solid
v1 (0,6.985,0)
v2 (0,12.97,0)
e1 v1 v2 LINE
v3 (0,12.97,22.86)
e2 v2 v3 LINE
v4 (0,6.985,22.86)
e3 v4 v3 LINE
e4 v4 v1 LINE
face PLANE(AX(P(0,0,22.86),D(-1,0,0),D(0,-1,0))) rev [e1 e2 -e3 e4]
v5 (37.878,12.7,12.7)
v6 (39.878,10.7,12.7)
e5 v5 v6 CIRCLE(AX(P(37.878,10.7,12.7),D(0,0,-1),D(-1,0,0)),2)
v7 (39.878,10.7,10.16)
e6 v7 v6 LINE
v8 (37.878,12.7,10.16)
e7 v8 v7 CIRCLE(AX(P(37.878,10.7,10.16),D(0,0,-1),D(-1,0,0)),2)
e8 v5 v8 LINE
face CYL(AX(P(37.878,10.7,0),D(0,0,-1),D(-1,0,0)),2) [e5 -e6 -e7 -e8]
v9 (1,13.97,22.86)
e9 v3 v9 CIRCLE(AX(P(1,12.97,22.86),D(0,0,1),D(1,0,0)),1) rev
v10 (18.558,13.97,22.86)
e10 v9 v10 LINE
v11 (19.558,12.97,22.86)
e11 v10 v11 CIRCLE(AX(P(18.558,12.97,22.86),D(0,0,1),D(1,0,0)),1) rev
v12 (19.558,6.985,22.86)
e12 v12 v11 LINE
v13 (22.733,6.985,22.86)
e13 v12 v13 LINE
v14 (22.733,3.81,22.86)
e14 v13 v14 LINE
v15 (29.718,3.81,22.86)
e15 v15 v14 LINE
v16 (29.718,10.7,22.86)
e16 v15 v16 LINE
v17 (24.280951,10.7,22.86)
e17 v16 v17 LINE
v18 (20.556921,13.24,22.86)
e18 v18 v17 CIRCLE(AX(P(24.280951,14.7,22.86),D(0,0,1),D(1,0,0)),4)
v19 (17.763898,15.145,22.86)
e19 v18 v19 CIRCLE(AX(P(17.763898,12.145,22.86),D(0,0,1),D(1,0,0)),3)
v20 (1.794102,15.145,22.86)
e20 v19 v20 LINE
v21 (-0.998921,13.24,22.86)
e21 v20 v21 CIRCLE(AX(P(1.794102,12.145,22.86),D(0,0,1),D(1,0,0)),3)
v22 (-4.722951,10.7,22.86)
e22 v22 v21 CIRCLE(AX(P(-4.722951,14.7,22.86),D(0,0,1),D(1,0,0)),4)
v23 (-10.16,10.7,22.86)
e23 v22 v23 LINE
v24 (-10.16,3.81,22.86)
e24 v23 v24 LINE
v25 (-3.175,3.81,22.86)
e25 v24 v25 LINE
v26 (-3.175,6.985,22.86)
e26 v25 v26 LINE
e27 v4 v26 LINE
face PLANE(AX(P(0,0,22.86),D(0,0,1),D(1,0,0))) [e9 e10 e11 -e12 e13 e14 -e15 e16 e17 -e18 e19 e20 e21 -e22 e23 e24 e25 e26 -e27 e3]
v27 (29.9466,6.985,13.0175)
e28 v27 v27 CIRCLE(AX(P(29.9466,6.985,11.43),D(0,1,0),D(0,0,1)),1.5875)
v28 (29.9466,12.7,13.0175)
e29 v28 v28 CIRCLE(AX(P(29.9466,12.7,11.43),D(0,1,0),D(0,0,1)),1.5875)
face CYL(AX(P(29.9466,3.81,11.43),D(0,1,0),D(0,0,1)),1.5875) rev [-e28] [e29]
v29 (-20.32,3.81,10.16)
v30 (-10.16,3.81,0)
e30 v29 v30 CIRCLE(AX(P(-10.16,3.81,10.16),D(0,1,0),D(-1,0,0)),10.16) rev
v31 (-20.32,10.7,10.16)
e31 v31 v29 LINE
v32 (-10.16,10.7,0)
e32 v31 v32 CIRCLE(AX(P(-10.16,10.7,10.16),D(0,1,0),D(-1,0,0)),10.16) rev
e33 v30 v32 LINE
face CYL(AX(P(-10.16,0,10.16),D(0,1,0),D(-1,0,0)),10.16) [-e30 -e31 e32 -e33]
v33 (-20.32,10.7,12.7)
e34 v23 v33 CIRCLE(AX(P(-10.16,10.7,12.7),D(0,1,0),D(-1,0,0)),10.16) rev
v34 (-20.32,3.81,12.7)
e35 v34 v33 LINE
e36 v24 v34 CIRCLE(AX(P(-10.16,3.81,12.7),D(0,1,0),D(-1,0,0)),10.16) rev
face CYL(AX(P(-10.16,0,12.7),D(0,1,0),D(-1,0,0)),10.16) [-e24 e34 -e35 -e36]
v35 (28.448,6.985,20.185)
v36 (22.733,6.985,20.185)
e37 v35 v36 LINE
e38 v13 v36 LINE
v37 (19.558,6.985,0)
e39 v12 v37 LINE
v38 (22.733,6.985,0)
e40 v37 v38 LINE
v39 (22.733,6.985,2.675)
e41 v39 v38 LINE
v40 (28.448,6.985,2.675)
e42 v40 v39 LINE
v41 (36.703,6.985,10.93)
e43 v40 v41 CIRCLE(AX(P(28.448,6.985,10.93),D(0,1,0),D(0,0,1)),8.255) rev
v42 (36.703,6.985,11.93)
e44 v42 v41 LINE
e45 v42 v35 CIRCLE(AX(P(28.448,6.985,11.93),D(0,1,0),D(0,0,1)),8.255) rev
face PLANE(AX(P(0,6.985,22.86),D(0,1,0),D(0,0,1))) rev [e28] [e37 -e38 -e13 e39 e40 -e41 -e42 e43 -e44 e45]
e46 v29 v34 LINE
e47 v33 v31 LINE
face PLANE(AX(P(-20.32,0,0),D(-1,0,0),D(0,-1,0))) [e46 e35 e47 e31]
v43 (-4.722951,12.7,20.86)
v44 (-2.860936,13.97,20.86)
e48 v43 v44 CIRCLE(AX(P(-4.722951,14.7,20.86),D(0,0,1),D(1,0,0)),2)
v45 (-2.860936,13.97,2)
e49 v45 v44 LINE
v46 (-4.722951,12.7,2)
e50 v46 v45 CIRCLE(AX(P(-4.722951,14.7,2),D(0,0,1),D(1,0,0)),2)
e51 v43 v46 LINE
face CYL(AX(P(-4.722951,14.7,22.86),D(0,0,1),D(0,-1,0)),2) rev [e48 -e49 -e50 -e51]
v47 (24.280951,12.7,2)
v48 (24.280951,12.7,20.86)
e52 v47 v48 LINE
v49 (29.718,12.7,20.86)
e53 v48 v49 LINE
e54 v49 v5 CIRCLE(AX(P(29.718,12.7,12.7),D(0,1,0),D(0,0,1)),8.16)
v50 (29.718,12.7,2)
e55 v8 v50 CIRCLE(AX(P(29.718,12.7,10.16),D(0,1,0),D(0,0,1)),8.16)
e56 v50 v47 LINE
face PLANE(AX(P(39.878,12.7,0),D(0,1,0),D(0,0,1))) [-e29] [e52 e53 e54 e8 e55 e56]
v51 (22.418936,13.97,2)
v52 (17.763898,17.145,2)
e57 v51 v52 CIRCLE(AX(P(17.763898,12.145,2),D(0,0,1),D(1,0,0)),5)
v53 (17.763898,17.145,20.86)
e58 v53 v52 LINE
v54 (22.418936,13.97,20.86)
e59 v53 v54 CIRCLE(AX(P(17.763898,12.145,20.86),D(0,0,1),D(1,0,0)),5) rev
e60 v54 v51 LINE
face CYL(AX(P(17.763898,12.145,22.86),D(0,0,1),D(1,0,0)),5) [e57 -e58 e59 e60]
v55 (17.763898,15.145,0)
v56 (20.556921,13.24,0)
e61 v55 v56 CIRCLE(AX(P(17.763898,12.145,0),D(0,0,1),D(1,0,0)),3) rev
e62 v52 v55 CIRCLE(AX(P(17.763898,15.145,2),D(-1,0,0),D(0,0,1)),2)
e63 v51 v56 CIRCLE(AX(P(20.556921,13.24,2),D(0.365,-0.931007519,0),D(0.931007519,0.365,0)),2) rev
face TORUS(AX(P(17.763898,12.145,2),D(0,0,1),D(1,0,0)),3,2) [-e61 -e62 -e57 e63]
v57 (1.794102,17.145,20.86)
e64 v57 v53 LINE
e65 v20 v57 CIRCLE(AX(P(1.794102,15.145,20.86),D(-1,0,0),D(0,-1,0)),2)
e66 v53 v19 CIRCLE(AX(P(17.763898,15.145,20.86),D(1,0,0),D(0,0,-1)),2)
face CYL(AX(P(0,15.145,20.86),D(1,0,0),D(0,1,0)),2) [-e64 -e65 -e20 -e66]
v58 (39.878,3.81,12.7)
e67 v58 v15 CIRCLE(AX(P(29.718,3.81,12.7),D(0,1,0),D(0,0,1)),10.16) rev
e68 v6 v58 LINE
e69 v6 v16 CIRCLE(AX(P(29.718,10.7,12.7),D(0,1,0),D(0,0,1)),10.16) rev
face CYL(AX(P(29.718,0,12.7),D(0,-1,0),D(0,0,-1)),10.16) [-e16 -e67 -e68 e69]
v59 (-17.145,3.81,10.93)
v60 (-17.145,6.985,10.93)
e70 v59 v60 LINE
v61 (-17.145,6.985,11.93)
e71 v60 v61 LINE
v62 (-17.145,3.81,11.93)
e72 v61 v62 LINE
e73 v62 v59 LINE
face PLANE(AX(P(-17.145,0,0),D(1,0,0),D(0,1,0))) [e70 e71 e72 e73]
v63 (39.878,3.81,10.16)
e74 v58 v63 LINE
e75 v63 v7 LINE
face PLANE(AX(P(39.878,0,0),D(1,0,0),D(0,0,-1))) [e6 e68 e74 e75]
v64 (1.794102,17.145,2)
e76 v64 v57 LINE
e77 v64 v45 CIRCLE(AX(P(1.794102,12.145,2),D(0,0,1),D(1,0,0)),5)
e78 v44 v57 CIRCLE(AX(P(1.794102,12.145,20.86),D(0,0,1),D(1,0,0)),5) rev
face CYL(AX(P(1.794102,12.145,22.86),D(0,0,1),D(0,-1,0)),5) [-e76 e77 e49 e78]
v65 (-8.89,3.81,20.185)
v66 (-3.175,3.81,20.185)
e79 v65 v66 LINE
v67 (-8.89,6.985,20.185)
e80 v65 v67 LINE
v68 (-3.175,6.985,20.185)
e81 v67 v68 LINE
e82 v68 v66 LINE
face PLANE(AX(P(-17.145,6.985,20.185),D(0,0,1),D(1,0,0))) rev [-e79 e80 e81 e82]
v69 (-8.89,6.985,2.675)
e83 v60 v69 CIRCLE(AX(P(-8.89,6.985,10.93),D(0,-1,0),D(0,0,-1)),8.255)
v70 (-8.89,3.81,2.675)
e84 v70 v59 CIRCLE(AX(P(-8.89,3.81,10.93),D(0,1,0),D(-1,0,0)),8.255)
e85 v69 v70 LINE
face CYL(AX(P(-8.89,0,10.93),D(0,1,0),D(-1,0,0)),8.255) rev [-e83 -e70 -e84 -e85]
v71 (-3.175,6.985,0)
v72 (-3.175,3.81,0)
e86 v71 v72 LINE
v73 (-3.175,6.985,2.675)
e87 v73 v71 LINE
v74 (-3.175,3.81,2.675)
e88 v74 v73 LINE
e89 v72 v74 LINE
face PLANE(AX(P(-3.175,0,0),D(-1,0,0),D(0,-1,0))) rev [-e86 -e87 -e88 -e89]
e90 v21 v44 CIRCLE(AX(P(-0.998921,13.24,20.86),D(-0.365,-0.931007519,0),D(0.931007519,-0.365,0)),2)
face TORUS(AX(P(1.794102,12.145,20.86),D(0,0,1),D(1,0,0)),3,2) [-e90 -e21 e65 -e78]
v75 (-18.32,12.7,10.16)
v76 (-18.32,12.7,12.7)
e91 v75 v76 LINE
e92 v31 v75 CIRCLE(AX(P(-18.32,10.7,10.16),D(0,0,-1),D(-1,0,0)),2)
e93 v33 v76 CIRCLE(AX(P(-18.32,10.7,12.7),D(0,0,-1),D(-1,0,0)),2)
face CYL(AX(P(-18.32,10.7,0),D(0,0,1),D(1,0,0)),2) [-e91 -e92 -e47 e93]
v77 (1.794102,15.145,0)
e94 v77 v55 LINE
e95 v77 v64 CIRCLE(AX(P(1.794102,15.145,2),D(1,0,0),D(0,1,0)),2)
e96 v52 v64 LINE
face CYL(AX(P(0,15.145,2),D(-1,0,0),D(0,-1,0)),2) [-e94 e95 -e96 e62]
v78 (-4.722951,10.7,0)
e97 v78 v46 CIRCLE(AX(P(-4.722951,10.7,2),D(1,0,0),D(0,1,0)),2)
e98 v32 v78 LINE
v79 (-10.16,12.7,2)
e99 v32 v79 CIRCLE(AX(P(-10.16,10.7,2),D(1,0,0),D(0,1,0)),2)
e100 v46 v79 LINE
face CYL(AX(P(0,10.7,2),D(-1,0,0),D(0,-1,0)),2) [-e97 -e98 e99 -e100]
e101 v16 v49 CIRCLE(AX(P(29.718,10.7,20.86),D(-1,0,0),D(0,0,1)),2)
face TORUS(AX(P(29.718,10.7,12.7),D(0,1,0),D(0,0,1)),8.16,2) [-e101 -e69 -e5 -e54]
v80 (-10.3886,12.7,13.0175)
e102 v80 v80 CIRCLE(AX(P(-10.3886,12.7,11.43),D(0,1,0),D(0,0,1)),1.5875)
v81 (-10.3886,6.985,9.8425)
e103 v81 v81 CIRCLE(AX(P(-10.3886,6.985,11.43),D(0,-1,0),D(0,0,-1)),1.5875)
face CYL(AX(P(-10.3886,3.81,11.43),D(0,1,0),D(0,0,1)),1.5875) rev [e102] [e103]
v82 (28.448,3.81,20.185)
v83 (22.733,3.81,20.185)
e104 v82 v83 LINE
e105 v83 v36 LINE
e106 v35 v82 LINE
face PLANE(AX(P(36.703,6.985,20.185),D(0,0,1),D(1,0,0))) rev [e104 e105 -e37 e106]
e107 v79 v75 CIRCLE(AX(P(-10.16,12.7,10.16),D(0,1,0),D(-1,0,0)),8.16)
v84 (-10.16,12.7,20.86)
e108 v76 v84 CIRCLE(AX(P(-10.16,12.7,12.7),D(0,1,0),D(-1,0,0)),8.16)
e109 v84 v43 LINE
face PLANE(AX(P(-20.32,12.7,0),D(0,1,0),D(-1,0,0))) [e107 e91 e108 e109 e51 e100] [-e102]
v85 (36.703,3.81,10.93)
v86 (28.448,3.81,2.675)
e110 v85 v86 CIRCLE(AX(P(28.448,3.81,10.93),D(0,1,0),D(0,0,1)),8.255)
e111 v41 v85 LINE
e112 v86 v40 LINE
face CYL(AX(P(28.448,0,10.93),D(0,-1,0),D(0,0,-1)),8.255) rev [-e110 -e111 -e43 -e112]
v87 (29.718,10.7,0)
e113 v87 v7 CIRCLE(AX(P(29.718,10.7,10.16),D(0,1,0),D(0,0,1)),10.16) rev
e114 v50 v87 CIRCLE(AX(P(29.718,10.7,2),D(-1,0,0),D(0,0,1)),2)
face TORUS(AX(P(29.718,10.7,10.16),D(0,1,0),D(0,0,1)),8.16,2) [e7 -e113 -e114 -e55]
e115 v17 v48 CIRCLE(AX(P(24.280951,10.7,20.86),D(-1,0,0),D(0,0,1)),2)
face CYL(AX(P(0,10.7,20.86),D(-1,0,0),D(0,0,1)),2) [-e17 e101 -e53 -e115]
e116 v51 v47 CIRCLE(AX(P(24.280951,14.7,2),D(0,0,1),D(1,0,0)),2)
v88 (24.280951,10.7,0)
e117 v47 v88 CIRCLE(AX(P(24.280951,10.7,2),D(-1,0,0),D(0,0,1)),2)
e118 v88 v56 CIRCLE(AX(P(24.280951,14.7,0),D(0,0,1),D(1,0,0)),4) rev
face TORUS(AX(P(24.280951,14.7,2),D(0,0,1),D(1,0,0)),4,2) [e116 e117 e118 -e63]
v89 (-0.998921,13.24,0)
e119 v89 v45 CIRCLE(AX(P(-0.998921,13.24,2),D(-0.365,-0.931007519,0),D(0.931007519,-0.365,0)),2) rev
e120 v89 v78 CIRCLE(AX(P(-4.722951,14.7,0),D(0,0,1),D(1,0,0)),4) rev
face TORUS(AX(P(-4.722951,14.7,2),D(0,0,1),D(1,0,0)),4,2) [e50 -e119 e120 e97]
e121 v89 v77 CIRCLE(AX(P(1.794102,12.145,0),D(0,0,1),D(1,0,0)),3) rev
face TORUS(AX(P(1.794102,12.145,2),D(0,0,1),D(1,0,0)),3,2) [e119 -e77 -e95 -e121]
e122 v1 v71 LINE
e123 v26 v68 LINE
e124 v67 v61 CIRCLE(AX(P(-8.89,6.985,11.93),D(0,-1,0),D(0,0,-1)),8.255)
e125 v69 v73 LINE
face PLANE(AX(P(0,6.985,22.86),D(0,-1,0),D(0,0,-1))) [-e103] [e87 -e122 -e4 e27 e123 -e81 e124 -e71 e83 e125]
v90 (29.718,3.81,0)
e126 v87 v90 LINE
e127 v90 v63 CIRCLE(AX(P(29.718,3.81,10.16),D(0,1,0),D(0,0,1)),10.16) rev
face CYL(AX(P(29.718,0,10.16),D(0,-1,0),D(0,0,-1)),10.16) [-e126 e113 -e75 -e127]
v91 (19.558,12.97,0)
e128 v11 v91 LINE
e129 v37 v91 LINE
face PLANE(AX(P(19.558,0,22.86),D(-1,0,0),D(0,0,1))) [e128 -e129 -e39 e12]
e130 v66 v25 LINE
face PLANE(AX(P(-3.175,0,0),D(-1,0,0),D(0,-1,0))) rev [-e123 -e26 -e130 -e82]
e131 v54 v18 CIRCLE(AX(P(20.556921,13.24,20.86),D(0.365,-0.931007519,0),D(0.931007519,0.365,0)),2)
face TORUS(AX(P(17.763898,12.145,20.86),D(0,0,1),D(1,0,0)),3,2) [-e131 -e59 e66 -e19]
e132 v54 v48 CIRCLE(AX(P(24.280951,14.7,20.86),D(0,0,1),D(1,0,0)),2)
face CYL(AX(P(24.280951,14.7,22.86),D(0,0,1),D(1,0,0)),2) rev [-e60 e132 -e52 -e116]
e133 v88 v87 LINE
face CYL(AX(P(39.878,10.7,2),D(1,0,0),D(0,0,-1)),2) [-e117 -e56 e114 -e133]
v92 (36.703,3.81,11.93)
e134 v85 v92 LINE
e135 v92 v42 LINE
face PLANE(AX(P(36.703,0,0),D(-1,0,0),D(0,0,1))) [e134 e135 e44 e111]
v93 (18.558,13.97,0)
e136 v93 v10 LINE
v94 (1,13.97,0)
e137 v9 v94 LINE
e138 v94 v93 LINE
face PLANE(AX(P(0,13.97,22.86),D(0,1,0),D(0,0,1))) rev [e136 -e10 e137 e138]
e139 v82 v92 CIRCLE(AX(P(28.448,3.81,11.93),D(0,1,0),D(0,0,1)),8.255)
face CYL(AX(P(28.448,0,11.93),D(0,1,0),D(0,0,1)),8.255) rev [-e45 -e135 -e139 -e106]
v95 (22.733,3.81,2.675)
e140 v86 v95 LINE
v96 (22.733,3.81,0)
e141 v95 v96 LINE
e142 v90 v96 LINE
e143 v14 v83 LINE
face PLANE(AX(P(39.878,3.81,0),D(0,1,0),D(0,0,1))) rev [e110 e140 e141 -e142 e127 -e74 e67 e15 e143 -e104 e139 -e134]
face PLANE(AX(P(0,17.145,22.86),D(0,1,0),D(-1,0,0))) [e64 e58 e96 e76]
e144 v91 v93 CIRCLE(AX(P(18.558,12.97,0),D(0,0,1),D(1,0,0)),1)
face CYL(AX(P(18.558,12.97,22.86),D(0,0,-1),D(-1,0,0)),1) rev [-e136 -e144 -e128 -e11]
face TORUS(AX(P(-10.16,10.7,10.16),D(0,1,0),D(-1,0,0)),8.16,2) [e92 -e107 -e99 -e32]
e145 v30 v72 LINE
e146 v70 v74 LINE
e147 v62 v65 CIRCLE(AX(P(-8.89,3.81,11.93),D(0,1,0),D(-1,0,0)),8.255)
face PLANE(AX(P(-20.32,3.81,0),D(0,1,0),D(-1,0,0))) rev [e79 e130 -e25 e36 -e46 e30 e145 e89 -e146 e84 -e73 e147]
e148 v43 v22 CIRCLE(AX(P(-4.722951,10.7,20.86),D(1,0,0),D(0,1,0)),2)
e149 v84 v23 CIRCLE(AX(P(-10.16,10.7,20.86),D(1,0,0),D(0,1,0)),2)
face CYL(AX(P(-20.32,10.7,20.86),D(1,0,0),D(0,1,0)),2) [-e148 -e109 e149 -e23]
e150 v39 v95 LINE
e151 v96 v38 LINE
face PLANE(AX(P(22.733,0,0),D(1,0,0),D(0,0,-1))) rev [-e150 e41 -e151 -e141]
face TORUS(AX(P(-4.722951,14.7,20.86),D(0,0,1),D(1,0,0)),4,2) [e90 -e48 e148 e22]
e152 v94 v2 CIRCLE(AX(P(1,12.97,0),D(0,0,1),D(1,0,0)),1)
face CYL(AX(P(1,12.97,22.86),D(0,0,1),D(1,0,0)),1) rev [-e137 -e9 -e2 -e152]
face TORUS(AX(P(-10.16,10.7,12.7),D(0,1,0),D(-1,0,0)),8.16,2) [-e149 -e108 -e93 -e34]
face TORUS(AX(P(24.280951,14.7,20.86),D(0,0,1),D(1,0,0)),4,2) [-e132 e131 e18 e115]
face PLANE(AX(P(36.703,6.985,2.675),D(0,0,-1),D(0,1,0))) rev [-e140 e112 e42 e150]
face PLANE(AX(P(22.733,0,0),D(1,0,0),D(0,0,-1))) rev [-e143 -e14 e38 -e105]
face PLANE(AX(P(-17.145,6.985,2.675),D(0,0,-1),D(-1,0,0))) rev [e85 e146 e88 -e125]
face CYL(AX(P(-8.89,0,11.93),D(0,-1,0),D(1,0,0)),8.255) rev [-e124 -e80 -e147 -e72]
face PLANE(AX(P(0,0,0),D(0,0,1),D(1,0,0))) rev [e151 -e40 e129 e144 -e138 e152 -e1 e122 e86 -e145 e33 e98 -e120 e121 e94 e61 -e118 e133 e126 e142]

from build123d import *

# Parameters (mm, degrees)
BOSS_EXTRUDE1_DEPTH = 22.86
SKETCH2_W           = 22.86
SKETCH2_H           = 5.715
SKETCH2_H_2         = 3.175
BOSS_EXTRUDE2_DEPTH = 17.145
SKETCH3_W           = 22.86
SKETCH3_H           = 5.715
SKETCH3_H_2         = 3.175
BOSS_EXTRUDE3_DEPTH = 17.145
SKETCH4_W           = 17.51
SKETCH4_H           = 3.175
CUT_EXTRUDE1_DEPTH  = 13.97
SKETCH5_W           = 17.51
SKETCH5_H           = 3.175
CUT_EXTRUDE2_DEPTH  = 13.97
SKETCH6_R           = 1.5875
CUT_EXTRUDE3_DEPTH  = 8.89
FILLET1_R           = 8.255
FILLET2_R           = 10.16
FILLET3_R           = 1
FILLET4_R           = 5
FILLET5_R           = 2


with BuildPart() as part:
    # Sketch1 → Boss-Extrude1 (new body)
    with BuildSketch(Plane.XY):
        Polygon((22.733, 17.145), (9.779, 17.145), (9.779, 13.97), (19.558, 13.97), (19.558, 6.985), (22.733, 6.985), align=None)
        Polygon((9.779, 13.97), (9.779, 17.145), (-3.175, 17.145), (-3.175, 6.985), (0, 6.985), (0, 13.97), align=None)
    extrude(amount=BOSS_EXTRUDE1_DEPTH)

    # Sketch2 → Boss-Extrude2 (add)
    with BuildSketch(Plane.ZY.offset(3.175)):
        with Locations((11.43, 9.8425)):
            Rectangle(SKETCH2_W, SKETCH2_H)
        with Locations((11.43, 5.3975)):
            Rectangle(SKETCH2_W, SKETCH2_H_2)
    extrude(amount=BOSS_EXTRUDE2_DEPTH)

    # Sketch3 → Boss-Extrude3 (add)
    with BuildSketch(Plane(origin=(22.733, 0, 0), x_dir=(0, 0, -1), z_dir=(1, 0, 0))):
        with Locations((-11.43, 9.8425)):
            Rectangle(SKETCH3_W, SKETCH3_H)
        with Locations((-11.43, 5.3975)):
            Rectangle(SKETCH3_W, SKETCH3_H_2)
    extrude(amount=BOSS_EXTRUDE3_DEPTH)

    # Sketch4 → Cut-Extrude1 (cut)
    with BuildSketch(Plane.ZY.offset(-22.733)):
        with Locations((11.43, 5.3975)):
            Rectangle(SKETCH4_W, SKETCH4_H)
    extrude(amount=-CUT_EXTRUDE1_DEPTH, mode=Mode.SUBTRACT)

    # Sketch5 → Cut-Extrude2 (cut)
    with BuildSketch(Plane(origin=(-3.175, 0, 0), x_dir=(0, 0, -1), z_dir=(1, 0, 0))):
        with Locations((-11.43, 5.3975)):
            Rectangle(SKETCH5_W, SKETCH5_H)
    extrude(amount=-CUT_EXTRUDE2_DEPTH, mode=Mode.SUBTRACT)

    # Sketch6 → Cut-Extrude3 (cut)
    with BuildSketch(Plane(origin=(0, 12.7, 0), x_dir=(1, 0, 0), z_dir=(0, 1, 0))):
        with Locations(Location((29.9466, -11.43, 0), (0, 0, 270))):
            Circle(SKETCH6_R)
        with Locations(Location((-10.3886, -11.43, 0), (0, 0, 270))):
            Circle(SKETCH6_R)
    extrude(amount=-CUT_EXTRUDE3_DEPTH, mode=Mode.SUBTRACT)

    # Fillet1
    fillet1_edges = [part.edges().sort_by_distance(p)[0] for p in [
        (36.703, 5.3975, 2.675),
        (36.703, 5.3975, 20.185),
        (-17.145, 5.3975, 20.185),
        (-17.145, 5.3975, 2.675),
    ]]
    fillet(fillet1_edges, radius=FILLET1_R)

    # Fillet2
    fillet2_edges = [part.edges().sort_by_distance(p)[0] for p in [
        (-20.32, 8.255, 22.86),
        (-20.32, 8.255, 0),
        (39.878, 8.255, 22.86),
        (39.878, 8.255, 0),
    ]]
    fillet(fillet2_edges, radius=FILLET2_R)

    # Fillet3
    fillet3_edges = [part.edges().sort_by_distance(p)[0] for p in [
        (19.558, 13.97, 11.43),
        (0, 13.97, 11.43),
    ]]
    fillet(fillet3_edges, radius=FILLET3_R)

    # Fillet4
    # the kernel refuses this fillet: 5 mm, written as the material it takes off along each edge
    with BuildSketch(Plane(origin=(22.733, 17.145, -12.422755079), x_dir=(-1, 0, 0), z_dir=(0, 0, 1))) as fillet4_piece_1:
        with BuildLine():
            CenterArc((4.969102032, 5), FILLET4_R, 186.372964386, 83.627035614)
            Line((0, 4.445), (-0.099382041, 4.4339))
            ThreePointArc((-0.099382041, 4.4339), (-0.1, 2.2225), (-0.1, 0))
            Line((-0.1, 0), (0, -0.1))
            Line((0, -0.1), (4.969102032, -0.1))
            Line((4.969102032, -0.1), (4.969102032, 0))
        make_face()
    extrude(amount=47.705510158, mode=Mode.SUBTRACT)
    with BuildSketch(Plane(origin=(-3.175, 17.145, -12.422755079), x_dir=(0, -1, 0), z_dir=(0, 0, 1))) as fillet4_piece_2:
        with BuildLine():
            CenterArc((5, 4.969102032), FILLET4_R, 180, 83.627035614)
            Line((0, 4.969102032), (-0.1, 4.969102032))
            Line((-0.1, 4.969102032), (-0.1, 0))
            Line((-0.1, 0), (0, -0.1))
            ThreePointArc((0, -0.1), (2.2225, -0.1), (4.4339, -0.099382041))
            Line((4.4339, -0.099382041), (4.445, 0))
        make_face()
    extrude(amount=47.705510158, mode=Mode.SUBTRACT)

    # Fillet5
    fillet5_edges = [part.edges().sort_by_distance(p)[0] for p in [
        (-20.32, 12.7, 11.43),
        (-6.6675, 12.7, 0),
        (-6.6675, 12.7, 22.86),
        (-17.344204897, 12.7, 2.975795103),
        (-17.344204897, 12.7, 19.884204897),
        (26.2255, 12.7, 22.86),
        (26.2255, 12.7, 0),
        (39.878, 12.7, 11.43),
        (36.902204897, 12.7, 2.975795103),
        (36.902204897, 12.7, 19.884204897),
        (9.779, 17.145, 0),
        (9.779, 17.145, 22.86),
        (-1.539439629, 15.871593619, 0),
        (21.097439629, 15.871593619, 0),
        (-1.539439629, 15.871593619, 22.86),
        (21.097439629, 15.871593619, 22.86),
        (-3.175, 12.7, 11.43),
        (22.733, 12.7, 11.43),
    ]]
    fillet(fillet5_edges, radius=FILLET5_R)


solid = part.part
